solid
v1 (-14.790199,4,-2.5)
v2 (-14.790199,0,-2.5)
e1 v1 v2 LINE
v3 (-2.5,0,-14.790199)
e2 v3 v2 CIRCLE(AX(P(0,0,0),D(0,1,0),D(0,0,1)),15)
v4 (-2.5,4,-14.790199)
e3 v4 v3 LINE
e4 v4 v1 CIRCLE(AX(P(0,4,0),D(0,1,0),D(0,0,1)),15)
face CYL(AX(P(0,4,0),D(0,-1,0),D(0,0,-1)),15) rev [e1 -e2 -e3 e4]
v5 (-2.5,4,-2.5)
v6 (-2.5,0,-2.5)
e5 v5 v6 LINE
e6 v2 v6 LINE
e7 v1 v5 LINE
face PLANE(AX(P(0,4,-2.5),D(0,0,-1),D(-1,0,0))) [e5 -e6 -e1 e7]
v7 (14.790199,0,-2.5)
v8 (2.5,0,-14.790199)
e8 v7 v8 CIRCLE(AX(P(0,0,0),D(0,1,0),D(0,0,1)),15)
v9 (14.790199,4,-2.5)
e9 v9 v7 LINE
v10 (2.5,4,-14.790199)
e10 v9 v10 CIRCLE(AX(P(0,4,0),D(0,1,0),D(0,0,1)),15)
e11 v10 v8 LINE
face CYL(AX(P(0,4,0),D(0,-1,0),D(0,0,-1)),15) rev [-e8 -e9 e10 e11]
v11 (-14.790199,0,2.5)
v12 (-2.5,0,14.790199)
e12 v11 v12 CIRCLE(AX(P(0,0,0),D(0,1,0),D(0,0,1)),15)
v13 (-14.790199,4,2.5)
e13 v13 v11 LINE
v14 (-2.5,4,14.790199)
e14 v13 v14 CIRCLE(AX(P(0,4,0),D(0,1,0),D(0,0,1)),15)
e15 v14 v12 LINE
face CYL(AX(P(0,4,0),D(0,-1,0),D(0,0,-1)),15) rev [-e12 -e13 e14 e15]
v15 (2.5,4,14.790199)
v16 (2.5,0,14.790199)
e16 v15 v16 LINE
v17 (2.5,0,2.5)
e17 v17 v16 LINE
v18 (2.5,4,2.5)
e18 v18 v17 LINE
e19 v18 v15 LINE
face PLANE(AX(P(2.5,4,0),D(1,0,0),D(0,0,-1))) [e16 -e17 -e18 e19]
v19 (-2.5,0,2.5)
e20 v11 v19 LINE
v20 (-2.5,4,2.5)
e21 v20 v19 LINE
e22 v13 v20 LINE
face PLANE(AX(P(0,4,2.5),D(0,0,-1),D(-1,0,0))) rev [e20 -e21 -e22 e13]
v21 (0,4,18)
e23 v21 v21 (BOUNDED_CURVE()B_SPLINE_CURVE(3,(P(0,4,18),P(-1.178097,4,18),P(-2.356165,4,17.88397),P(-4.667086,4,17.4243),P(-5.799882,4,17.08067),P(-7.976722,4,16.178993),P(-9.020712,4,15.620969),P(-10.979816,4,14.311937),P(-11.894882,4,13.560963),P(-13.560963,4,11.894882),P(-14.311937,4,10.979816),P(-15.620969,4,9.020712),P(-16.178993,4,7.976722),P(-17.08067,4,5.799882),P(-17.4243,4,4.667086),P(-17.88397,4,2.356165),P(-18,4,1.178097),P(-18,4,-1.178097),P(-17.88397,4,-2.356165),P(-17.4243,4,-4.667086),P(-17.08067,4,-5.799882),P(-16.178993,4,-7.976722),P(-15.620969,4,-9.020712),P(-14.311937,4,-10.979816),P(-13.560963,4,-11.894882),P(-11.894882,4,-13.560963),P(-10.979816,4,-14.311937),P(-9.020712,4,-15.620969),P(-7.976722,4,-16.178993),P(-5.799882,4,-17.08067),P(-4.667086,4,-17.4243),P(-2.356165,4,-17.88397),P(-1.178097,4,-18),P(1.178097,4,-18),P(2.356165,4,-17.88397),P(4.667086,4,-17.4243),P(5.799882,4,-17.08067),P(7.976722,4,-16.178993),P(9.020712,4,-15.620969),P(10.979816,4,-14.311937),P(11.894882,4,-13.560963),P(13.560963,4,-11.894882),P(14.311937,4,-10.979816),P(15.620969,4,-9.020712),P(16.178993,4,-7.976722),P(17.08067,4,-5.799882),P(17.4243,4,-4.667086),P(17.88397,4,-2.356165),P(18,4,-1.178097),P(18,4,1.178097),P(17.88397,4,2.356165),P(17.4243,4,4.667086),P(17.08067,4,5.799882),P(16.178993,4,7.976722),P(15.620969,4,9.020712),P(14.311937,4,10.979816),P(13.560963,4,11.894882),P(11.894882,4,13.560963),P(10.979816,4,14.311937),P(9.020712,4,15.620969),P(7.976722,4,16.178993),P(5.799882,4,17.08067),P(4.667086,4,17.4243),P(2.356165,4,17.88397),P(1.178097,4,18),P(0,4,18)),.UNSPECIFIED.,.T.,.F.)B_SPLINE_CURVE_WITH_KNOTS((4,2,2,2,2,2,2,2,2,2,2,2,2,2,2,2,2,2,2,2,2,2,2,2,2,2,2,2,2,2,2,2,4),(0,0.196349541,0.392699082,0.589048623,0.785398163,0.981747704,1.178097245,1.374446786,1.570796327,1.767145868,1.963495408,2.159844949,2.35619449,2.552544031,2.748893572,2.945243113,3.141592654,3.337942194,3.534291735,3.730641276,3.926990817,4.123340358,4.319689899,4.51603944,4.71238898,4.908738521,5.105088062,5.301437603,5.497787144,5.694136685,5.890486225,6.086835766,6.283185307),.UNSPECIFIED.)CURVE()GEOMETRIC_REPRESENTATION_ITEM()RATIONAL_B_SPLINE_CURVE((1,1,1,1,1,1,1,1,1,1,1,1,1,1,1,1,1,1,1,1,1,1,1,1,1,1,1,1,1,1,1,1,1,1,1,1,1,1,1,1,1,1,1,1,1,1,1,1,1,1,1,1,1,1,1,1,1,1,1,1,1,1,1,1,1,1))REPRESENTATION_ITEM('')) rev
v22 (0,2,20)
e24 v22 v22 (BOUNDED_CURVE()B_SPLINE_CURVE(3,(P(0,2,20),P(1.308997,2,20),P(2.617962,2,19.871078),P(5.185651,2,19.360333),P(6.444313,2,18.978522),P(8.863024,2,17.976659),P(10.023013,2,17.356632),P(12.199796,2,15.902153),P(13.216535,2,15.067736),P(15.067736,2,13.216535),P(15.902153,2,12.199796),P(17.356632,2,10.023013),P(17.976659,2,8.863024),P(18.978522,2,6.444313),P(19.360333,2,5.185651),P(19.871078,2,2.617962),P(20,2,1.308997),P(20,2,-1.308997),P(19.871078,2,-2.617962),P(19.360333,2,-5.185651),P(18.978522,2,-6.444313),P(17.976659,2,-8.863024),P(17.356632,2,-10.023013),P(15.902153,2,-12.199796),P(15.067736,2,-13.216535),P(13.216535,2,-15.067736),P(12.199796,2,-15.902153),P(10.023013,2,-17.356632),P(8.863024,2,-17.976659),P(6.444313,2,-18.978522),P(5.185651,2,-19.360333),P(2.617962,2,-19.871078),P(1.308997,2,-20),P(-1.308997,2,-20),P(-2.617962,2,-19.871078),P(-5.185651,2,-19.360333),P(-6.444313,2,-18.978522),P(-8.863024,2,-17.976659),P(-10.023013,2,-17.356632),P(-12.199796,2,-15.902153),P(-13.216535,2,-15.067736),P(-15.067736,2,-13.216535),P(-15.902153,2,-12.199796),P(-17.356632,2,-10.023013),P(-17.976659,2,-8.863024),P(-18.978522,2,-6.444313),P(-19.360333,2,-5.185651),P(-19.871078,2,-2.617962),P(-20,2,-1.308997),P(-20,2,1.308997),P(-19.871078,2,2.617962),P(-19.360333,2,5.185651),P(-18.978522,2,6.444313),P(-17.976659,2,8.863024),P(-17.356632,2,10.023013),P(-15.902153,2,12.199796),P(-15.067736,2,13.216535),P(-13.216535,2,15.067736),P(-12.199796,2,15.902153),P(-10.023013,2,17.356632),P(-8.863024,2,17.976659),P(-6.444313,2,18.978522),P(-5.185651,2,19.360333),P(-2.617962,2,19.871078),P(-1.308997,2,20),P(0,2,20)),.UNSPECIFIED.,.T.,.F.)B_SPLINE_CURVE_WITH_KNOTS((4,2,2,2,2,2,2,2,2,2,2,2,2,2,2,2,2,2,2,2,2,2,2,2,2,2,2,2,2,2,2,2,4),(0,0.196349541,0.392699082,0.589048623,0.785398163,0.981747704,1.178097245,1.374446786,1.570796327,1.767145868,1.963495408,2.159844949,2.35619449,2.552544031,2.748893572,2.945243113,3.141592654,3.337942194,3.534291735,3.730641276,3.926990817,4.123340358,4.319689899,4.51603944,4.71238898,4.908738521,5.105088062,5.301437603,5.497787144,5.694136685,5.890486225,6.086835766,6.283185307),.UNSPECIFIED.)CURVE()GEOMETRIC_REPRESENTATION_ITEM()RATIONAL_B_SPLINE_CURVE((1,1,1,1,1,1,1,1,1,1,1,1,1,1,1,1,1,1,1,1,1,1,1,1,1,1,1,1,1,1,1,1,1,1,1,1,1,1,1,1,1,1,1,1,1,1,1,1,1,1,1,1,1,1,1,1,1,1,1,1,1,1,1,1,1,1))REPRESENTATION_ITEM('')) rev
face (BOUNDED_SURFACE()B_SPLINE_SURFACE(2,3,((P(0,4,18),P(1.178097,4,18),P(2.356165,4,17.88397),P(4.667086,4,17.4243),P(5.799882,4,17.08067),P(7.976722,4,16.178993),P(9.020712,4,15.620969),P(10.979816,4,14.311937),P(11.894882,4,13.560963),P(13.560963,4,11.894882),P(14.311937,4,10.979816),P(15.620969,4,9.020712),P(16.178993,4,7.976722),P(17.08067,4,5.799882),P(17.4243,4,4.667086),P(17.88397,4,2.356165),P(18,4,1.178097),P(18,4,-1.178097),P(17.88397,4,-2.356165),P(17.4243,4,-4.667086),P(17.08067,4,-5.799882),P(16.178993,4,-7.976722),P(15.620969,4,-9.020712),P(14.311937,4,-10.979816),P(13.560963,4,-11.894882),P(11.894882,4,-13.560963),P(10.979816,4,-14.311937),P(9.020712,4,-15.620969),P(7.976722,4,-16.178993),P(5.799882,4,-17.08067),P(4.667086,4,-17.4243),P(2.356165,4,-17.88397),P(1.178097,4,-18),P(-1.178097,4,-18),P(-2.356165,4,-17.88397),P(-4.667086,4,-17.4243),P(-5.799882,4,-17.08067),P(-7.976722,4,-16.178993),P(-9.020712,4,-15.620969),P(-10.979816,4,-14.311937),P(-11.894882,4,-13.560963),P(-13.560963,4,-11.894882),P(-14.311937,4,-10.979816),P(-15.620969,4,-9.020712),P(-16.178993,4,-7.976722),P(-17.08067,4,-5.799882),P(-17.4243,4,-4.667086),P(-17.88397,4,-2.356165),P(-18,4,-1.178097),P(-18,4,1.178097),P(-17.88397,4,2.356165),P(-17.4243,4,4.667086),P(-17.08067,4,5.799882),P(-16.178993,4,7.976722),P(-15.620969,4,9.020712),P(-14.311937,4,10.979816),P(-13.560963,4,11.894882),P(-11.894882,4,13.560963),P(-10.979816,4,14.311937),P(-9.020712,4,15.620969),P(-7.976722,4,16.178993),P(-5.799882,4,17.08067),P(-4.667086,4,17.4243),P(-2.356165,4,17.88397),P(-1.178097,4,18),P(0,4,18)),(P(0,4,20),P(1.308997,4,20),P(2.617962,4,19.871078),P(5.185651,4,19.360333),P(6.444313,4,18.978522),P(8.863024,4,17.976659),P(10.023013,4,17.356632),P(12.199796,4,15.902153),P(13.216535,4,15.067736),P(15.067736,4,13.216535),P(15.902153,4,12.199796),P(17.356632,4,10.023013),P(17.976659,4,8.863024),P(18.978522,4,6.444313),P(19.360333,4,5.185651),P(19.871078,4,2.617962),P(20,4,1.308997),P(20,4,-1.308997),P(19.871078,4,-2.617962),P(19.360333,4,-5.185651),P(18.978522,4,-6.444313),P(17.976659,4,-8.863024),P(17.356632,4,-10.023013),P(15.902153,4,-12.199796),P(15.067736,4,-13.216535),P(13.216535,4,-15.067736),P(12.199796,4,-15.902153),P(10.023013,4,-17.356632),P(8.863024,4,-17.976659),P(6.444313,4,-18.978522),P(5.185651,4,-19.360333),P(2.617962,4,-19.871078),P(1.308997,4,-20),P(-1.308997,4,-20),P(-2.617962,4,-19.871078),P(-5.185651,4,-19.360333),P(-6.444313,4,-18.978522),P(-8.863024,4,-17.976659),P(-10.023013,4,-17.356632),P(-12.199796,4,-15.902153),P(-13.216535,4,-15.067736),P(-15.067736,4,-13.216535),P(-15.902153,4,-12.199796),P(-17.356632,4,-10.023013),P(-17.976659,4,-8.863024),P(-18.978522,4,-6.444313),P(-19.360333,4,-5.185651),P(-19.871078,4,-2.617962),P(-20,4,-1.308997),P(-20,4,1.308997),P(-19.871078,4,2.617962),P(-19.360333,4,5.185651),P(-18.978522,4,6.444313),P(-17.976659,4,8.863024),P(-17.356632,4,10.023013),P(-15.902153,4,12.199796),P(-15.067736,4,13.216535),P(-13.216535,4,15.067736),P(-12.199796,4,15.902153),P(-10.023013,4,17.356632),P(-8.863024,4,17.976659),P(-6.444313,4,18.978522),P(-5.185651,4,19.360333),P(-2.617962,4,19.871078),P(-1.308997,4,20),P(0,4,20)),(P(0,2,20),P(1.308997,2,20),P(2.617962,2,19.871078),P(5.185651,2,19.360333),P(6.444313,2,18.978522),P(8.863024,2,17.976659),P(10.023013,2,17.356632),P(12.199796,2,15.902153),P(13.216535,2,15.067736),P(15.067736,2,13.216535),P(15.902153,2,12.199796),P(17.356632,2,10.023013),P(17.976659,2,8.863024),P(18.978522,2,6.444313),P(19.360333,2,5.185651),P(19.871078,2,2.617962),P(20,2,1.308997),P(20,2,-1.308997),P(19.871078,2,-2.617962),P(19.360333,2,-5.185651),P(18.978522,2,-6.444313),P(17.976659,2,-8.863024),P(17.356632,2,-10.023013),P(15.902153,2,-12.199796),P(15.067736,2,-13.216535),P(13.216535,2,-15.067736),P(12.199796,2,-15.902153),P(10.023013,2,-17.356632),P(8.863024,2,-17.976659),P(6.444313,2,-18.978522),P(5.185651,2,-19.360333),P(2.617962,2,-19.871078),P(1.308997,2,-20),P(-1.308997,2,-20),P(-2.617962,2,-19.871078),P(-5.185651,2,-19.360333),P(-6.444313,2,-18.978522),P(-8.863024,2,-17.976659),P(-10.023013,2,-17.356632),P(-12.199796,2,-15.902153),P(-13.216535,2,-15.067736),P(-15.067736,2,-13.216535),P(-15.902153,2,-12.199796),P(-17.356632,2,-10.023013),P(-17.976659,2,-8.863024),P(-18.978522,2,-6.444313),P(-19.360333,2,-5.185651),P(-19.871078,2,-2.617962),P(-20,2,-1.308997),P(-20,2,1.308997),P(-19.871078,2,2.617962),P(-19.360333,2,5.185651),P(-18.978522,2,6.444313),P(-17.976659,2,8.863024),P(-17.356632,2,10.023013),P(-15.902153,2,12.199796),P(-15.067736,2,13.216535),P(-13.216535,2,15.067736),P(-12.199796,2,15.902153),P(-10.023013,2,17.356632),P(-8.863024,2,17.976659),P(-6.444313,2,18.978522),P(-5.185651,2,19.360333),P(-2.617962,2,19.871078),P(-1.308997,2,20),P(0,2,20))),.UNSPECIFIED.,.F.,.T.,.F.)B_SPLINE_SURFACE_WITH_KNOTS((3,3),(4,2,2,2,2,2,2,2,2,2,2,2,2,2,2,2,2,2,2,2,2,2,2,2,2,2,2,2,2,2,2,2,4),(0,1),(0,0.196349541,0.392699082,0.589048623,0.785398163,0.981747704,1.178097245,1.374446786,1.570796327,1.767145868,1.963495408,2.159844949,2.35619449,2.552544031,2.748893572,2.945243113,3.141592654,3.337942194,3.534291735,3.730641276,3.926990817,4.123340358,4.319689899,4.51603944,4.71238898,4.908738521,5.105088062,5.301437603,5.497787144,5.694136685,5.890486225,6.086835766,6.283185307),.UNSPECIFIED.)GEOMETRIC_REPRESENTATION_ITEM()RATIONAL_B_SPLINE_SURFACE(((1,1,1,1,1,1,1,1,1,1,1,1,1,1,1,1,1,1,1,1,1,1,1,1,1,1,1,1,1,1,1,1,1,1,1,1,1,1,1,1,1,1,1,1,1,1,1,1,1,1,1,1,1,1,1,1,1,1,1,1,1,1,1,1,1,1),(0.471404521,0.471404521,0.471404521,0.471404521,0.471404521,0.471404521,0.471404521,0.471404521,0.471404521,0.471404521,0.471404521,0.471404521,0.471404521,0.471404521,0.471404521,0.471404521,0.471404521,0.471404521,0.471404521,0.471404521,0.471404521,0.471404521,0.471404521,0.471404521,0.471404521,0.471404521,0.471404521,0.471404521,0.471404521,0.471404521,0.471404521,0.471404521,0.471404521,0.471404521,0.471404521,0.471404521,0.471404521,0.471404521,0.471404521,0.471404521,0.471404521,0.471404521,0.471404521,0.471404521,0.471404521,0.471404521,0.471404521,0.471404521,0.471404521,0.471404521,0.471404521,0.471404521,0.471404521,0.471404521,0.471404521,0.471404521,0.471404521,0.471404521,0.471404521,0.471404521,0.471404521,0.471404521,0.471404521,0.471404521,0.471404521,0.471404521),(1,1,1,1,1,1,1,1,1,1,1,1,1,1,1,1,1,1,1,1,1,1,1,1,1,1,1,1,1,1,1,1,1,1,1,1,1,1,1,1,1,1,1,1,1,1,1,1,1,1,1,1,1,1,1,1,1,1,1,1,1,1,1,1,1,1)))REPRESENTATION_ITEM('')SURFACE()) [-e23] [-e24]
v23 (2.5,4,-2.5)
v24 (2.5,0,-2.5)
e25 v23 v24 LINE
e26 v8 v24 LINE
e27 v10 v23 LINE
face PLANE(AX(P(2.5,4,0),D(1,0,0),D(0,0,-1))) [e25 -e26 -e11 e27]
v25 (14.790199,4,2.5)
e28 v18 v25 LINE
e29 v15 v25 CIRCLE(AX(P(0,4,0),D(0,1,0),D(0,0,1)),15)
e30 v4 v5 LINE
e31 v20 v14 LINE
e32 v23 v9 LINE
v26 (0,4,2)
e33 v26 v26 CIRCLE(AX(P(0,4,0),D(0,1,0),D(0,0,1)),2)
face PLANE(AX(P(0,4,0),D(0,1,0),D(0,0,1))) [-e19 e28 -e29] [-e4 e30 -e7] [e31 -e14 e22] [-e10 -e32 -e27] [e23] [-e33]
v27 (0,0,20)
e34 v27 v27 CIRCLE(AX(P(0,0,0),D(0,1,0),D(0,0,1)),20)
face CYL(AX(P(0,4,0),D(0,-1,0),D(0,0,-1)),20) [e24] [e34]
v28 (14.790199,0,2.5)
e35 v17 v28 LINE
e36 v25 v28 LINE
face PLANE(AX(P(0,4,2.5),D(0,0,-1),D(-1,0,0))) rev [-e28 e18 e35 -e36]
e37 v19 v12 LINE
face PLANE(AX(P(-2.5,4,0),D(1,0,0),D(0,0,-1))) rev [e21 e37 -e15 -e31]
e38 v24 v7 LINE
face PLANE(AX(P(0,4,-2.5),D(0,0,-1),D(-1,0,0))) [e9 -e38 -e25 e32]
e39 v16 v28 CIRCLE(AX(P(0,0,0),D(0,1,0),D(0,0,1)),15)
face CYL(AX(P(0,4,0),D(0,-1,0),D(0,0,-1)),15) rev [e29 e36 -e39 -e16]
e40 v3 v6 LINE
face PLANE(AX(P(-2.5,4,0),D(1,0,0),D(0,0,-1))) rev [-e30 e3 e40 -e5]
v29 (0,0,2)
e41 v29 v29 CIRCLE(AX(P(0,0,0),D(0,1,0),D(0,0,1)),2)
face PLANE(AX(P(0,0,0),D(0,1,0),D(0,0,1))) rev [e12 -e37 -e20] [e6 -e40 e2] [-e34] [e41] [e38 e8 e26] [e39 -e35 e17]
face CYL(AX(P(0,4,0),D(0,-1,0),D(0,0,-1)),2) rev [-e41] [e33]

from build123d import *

# Parameters (mm, degrees)
SKETCH2_R           = 20
SKETCH2_R_2         = 2
BOSS_EXTRUDE1_DEPTH = 4
FILLET2_SIZE        = 2


with BuildPart() as part:
    # Sketch2 → Boss-Extrude1 (new body)
    with BuildSketch(Plane(origin=(0, 0, 0), x_dir=(1, 0, 0), z_dir=(0, 1, 0))):
        with Locations(Location((0, 0, 0), (0, 0, 270))):
            Circle(SKETCH2_R)
        with BuildLine():
            Line((-2.5, 14.790199458), (-2.5, 2.5))
            Line((-2.5, 2.5), (-14.790199458, 2.5))
            ThreePointArc((-14.790199458, 2.5), (-10.606601718, 10.606601718), (-2.5, 14.790199458))
        make_face(mode=Mode.SUBTRACT)
        with BuildLine():
            Line((-14.790199458, -2.5), (-2.5, -2.5))
            Line((-2.5, -2.5), (-2.5, -14.790199458))
            ThreePointArc((-2.5, -14.790199458), (-10.606601718, -10.606601718), (-14.790199458, -2.5))
        make_face(mode=Mode.SUBTRACT)
        with BuildLine():
            Line((2.5, -14.790199458), (2.5, -2.5))
            Line((2.5, -2.5), (14.790199458, -2.5))
            ThreePointArc((14.790199458, -2.5), (10.606601718, -10.606601718), (2.5, -14.790199458))
        make_face(mode=Mode.SUBTRACT)
        with BuildLine():
            Line((14.790199458, 2.5), (2.5, 2.5))
            Line((2.5, 2.5), (2.5, 14.790199458))
            ThreePointArc((2.5, 14.790199458), (10.606601718, 10.606601718), (14.790199458, 2.5))
        make_face(mode=Mode.SUBTRACT)
        with Locations(Location((0, 0, 0), (0, 0, 270))):
            Circle(SKETCH2_R_2, mode=Mode.SUBTRACT)
    extrude(amount=BOSS_EXTRUDE1_DEPTH)

    # Fillet2
    # a fillet whose section is not a circle: 2 mm, written as the material it takes off along each edge
    with BuildSketch(Plane(origin=(0, 4, 0), x_dir=(0, 0, 1), z_dir=(-1, 0, 0))) as fillet2_piece_1:
        with BuildLine():
            Bezier((20, -FILLET2_SIZE), (20, 0), (20 - FILLET2_SIZE, 0), weights=[1, 0.471404521, 1])
            Line((20 - FILLET2_SIZE, 0), (20, 0))
            Line((20, 0), (20, -FILLET2_SIZE))
        make_face()
    revolve(axis=Axis((0, 4, 0), (0, 1, 0)), mode=Mode.SUBTRACT)


solid = part.part
